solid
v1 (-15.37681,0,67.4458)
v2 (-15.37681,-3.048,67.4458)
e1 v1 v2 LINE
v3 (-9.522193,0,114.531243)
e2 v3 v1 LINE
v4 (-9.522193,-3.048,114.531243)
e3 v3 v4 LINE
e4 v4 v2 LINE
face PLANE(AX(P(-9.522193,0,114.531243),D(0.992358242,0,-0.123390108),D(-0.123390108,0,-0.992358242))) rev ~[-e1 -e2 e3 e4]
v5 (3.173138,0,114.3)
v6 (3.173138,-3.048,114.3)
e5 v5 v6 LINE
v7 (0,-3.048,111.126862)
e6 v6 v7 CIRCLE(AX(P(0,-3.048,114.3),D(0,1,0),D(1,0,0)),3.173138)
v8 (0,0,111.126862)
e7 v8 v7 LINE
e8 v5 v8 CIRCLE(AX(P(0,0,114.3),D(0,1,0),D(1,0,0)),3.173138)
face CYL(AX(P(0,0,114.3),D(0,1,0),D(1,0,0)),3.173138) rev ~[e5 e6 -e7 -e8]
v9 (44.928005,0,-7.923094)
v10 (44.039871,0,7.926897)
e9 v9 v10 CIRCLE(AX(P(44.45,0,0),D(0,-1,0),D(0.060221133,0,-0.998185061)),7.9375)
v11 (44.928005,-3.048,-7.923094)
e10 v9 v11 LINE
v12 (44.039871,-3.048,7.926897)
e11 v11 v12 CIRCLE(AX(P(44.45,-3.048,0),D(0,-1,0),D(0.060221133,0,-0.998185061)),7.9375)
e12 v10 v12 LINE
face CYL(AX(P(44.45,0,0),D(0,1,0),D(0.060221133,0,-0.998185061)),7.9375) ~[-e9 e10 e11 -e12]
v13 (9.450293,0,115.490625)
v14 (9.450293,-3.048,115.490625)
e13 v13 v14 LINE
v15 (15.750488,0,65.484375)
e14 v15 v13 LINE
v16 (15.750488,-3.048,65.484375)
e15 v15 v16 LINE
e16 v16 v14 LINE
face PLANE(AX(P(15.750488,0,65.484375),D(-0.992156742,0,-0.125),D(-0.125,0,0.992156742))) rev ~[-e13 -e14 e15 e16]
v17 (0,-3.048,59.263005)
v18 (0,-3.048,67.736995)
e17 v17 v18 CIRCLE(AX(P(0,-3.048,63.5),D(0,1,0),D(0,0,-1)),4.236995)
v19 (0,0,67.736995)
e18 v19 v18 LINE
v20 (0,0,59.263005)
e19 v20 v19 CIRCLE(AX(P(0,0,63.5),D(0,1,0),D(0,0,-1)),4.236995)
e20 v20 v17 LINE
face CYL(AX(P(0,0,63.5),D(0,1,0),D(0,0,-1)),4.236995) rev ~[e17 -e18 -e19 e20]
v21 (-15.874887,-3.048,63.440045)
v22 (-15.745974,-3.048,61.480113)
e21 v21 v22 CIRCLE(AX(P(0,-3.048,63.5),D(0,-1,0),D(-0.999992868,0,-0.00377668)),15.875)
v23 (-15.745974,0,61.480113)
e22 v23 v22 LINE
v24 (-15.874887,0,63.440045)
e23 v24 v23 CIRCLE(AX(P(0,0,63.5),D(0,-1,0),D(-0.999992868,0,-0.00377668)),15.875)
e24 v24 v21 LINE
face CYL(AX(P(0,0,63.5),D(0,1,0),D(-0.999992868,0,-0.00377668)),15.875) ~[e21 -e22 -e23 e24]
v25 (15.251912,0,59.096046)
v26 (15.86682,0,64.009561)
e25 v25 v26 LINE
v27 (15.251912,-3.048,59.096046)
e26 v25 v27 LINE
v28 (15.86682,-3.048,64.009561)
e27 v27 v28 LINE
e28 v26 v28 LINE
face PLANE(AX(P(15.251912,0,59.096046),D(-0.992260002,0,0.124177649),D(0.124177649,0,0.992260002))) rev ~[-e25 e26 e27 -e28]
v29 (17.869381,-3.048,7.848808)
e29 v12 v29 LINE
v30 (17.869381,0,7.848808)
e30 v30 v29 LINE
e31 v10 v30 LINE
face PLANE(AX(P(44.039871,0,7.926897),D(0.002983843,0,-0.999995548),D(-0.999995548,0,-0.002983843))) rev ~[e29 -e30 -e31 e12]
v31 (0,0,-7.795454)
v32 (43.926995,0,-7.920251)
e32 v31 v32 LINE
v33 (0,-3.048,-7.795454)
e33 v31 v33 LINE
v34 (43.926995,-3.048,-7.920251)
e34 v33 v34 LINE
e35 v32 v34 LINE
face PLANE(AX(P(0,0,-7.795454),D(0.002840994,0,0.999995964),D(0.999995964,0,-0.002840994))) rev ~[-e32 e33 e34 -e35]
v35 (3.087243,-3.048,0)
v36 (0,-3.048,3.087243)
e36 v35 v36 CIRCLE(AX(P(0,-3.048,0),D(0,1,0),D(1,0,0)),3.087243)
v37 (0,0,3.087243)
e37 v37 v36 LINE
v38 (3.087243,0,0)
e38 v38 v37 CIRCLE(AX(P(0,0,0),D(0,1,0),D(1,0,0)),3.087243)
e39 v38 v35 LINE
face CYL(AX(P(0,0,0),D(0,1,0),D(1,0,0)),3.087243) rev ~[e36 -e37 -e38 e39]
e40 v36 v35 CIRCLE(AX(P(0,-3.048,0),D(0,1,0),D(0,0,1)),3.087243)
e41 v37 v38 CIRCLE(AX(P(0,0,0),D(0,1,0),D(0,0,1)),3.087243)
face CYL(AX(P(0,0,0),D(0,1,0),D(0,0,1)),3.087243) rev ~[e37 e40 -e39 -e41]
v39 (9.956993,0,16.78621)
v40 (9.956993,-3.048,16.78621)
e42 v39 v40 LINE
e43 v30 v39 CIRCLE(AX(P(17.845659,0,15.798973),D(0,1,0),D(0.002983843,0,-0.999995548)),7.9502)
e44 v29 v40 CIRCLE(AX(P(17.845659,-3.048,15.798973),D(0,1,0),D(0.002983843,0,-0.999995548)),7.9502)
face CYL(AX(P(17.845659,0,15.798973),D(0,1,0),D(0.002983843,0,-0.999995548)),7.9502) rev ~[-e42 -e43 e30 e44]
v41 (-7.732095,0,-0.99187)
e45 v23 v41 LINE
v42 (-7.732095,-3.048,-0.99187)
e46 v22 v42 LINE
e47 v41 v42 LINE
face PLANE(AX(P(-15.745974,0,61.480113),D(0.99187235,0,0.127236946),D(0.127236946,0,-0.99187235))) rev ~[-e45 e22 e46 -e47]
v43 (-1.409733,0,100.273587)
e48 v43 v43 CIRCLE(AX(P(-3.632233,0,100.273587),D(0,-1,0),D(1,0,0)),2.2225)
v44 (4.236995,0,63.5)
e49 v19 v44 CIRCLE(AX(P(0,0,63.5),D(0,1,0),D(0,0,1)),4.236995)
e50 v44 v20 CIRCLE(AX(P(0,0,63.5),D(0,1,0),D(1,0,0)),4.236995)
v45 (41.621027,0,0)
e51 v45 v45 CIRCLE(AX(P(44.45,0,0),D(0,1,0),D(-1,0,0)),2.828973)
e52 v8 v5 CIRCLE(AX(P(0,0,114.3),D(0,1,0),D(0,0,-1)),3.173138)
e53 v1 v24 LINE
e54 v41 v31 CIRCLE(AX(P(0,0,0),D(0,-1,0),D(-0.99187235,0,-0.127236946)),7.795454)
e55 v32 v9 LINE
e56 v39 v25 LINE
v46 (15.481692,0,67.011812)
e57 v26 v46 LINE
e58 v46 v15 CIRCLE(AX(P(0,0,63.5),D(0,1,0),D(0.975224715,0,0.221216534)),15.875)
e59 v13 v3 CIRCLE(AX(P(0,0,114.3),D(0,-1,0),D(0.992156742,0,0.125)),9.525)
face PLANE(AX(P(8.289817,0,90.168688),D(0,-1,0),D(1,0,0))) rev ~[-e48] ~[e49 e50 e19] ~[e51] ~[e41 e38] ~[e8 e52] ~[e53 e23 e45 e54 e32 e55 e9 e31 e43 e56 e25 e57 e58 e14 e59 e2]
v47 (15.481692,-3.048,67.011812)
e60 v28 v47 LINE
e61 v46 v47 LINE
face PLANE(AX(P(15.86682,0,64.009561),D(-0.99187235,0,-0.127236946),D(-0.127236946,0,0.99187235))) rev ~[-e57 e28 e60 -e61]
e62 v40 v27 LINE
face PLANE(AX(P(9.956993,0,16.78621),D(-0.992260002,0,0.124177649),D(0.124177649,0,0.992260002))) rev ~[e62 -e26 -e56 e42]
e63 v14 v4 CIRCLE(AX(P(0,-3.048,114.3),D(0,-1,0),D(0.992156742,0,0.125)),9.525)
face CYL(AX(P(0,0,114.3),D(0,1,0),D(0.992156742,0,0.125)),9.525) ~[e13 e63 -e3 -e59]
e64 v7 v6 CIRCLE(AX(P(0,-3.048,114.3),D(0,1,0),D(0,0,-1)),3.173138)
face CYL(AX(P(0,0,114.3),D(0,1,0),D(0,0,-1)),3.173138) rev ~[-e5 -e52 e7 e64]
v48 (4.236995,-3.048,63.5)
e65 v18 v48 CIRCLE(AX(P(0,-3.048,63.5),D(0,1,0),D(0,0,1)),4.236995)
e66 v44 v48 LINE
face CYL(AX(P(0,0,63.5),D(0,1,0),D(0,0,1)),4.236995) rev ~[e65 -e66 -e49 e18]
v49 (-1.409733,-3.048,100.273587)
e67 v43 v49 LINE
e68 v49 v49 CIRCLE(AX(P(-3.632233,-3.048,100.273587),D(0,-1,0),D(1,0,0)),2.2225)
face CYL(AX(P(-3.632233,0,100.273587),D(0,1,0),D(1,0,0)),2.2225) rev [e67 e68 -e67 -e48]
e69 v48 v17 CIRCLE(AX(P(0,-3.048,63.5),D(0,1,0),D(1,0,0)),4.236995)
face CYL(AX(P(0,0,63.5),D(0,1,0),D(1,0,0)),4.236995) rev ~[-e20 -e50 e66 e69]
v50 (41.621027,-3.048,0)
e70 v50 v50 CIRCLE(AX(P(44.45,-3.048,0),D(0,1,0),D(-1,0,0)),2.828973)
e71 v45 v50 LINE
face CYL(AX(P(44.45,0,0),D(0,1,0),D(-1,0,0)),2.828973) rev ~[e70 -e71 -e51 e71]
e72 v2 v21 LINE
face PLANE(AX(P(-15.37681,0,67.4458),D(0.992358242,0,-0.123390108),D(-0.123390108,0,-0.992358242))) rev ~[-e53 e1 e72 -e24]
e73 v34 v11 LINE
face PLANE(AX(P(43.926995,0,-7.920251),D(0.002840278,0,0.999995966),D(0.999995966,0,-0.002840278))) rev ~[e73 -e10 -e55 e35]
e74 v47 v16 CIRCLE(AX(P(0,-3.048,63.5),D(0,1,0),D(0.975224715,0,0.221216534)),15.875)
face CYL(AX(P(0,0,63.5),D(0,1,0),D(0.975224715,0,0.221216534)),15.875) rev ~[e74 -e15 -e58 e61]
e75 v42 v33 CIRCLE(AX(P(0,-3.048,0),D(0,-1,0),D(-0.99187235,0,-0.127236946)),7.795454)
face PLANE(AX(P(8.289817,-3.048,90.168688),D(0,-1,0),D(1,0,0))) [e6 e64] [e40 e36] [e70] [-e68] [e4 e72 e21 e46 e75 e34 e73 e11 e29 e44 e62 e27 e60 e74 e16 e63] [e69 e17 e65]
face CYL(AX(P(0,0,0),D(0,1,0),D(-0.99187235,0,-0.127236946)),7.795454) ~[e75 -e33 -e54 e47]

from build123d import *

# Parameters (mm, degrees)
F0_R     = 2.2225
F1_DEPTH = 3.048


# Not quite as in the source:
# - ends of sketch curves that miss each other by under 0.0002 mm in the source are joined


with BuildPart() as f1:
    # F0 (on Front) → F1 (new body)
    with BuildSketch(Plane.XZ):
        with BuildLine():
            Line((0, 104.775), (0, 79.375))
            ThreePointArc((0, 79.375), (9.9062001273, 75.9049515935), (15.4816923534, 67.0118124772))
            ThreePointArc((15.4816923534, 67.0118124772), (15.634754331, 66.2513782015), (15.7504882737, 65.484375))
            Line((15.7504882737, 65.484375), (9.4502929642, 115.490625))
            ThreePointArc((9.4502929642, 115.490625), (9.5063048942, 114.896483242), (9.525, 114.3))
            ThreePointArc((9.525, 114.3), (6.7351920908, 107.5648079092), (0, 104.775))
        make_face()
        with BuildLine():
            ThreePointArc((-15.3768101201, 67.4457997325), (-9.7307773134, 76.0430298523), (0, 79.375))
            Line((0, 79.375), (0, 104.775))
            ThreePointArc((0, 104.775), (-6.8164586923, 107.6470671207), (-9.5221925783, 114.5312433813))
            Line((-9.5221925783, 114.5312433813), (-15.3768101201, 67.4457997325))
        make_face()
        with Locations((-3.6322334781, 100.2735868096)):
            Circle(F0_R, mode=Mode.SUBTRACT)
        with BuildLine():
            ThreePointArc((-9.5221925783, 114.5312433813), (-6.8164586923, 107.6470671207), (0, 104.775))
            ThreePointArc((0, 104.775), (6.7351920908, 107.5648079092), (9.525, 114.3))
            ThreePointArc((9.525, 114.3), (9.5063048942, 114.896483242), (9.4502929642, 115.490625))
            ThreePointArc((9.4502929642, 115.490625), (-0.481036029, 123.8128454912), (-9.5221925783, 114.5312433813))
        make_face()
        with BuildLine():
            ThreePointArc((3.1731383542, 114.3), (2.2437476479, 112.0562523521), (0, 111.1268616458))
            ThreePointArc((0, 111.1268616458), (-2.2437476479, 116.5437476479), (3.1731383542, 114.3))
        make_face(mode=Mode.SUBTRACT)
        with BuildLine():
            Line((0, 59.2630050683), (0, 47.625))
            ThreePointArc((0, 47.625), (9.5420870367, 50.8128332563), (15.2519117252, 59.0960456714))
            Line((15.2519117252, 59.0960456714), (15.8668198703, 64.0095607934))
            Line((15.8668198703, 64.0095607934), (15.4816923534, 67.0118124772))
            ThreePointArc((15.4816923534, 67.0118124772), (9.9062001273, 75.9049515935), (0, 79.375))
            Line((0, 79.375), (0, 67.7369949317))
            ThreePointArc((0, 67.7369949317), (2.996007848, 66.496007848), (4.2369949317, 63.5))
            ThreePointArc((4.2369949317, 63.5), (2.996007848, 60.503992152), (0, 59.2630050683))
        make_face()
        with BuildLine():
            ThreePointArc((-15.7459735632, 61.4801134818), (-10.4868948341, 51.5819187057), (0, 47.625))
            Line((0, 47.625), (0, 59.2630050683))
            ThreePointArc((0, 59.2630050683), (-4.2369949317, 63.5), (0, 67.7369949317))
            Line((0, 67.7369949317), (0, 79.375))
            ThreePointArc((0, 79.375), (-9.7307773134, 76.0430298523), (-15.3768101201, 67.4457997325))
            Line((-15.3768101201, 67.4457997325), (-15.8748867846, 63.4400452066))
            ThreePointArc((-15.8748867846, 63.4400452066), (-15.8407712999, 62.4580836766), (-15.7459735632, 61.4801134818))
        make_face()
        with BuildLine():
            ThreePointArc((-7.7320952095, -0.9918697506), (-5.8524002287, 5.1496129461), (0, 7.7954539272))
            Line((0, 7.7954539272), (0, 47.625))
            ThreePointArc((0, 47.625), (-10.4868948341, 51.5819187057), (-15.7459735632, 61.4801134818))
            Line((-15.7459735632, 61.4801134818), (-7.7320952095, -0.9918697506))
        make_face()
        with BuildLine():
            Line((0, 47.625), (0, 7.7954539272))
            ThreePointArc((0, 7.7954539272), (5.5122183343, 5.5122183343), (7.7954539272, 0))
            Line((7.7954539272, 0), (36.5125, 0))
            ThreePointArc((36.5125, 0), (38.6941635505, 5.4657344444), (44.0398708389, 7.9268972695))
            Line((44.0398708389, 7.9268972695), (17.869380753, 7.8488082918))
            ThreePointArc((17.869380753, 7.8488082918), (11.8930439791, 10.5290526777), (9.9569931381, 16.7862100471))
            Line((9.9569931381, 16.7862100471), (15.2519117252, 59.0960456714))
            ThreePointArc((15.2519117252, 59.0960456714), (9.5420870367, 50.8128332563), (0, 47.625))
        make_face()
        with BuildLine():
            Line((36.5125, 0), (7.7954539272, 0))
            ThreePointArc((7.7954539272, 0), (5.5122183343, -5.5122183343), (0, -7.7954539272))
            Line((0, -7.7954539272), (43.9269950713, -7.9202507596))
            ThreePointArc((43.9269950713, -7.9202507596), (38.6553793104, -5.4245992768), (36.5125, 0))
        make_face()
        with BuildLine():
            ThreePointArc((3.0872431229, 0), (-2.1830105474, -2.1830105474), (0, 3.0872431229))
            Line((0, 3.0872431229), (0, 7.7954539272))
            ThreePointArc((0, 7.7954539272), (-5.8524002287, 5.1496129461), (-7.7320952095, -0.9918697506))
            ThreePointArc((-7.7320952095, -0.9918697506), (-5.1496129461, -5.8524002287), (0, -7.7954539272))
            ThreePointArc((0, -7.7954539272), (5.5122183343, -5.5122183343), (7.7954539272, 0))
            Line((7.7954539272, 0), (3.0872431229, 0))
        make_face()
        with BuildLine():
            Line((0, 7.7954539272), (0, 3.0872431229))
            ThreePointArc((0, 3.0872431229), (2.1830105474, 2.1830105474), (3.0872431229, 0))
            Line((3.0872431229, 0), (7.7954539272, 0))
            ThreePointArc((7.7954539272, 0), (5.5122183343, 5.5122183343), (0, 7.7954539272))
        make_face()
        with BuildLine():
            ThreePointArc((44.0398708389, 7.9268972695), (38.6941635505, 5.4657344444), (36.5125, 0))
            ThreePointArc((36.5125, 0), (38.6553793104, -5.4245992768), (43.9269950713, -7.9202507596))
            Line((43.9269950713, -7.9202507596), (44.9280052412, -7.9230939184))
            ThreePointArc((44.9280052412, -7.9230939184), (50.2291899455, -5.4410357308), (52.3875, 0))
            ThreePointArc((52.3875, 0), (49.9157344444, 5.7558364495), (44.0398708389, 7.9268972695))
        make_face()
        with BuildLine():
            ThreePointArc((47.2789731749, 0), (44.45, -2.8289731749), (41.6210268251, 0))
            ThreePointArc((41.6210268251, 0), (44.45, 2.8289731749), (47.2789731749, 0))
        make_face(mode=Mode.SUBTRACT)
    extrude(amount=F1_DEPTH)


solid = f1.part
